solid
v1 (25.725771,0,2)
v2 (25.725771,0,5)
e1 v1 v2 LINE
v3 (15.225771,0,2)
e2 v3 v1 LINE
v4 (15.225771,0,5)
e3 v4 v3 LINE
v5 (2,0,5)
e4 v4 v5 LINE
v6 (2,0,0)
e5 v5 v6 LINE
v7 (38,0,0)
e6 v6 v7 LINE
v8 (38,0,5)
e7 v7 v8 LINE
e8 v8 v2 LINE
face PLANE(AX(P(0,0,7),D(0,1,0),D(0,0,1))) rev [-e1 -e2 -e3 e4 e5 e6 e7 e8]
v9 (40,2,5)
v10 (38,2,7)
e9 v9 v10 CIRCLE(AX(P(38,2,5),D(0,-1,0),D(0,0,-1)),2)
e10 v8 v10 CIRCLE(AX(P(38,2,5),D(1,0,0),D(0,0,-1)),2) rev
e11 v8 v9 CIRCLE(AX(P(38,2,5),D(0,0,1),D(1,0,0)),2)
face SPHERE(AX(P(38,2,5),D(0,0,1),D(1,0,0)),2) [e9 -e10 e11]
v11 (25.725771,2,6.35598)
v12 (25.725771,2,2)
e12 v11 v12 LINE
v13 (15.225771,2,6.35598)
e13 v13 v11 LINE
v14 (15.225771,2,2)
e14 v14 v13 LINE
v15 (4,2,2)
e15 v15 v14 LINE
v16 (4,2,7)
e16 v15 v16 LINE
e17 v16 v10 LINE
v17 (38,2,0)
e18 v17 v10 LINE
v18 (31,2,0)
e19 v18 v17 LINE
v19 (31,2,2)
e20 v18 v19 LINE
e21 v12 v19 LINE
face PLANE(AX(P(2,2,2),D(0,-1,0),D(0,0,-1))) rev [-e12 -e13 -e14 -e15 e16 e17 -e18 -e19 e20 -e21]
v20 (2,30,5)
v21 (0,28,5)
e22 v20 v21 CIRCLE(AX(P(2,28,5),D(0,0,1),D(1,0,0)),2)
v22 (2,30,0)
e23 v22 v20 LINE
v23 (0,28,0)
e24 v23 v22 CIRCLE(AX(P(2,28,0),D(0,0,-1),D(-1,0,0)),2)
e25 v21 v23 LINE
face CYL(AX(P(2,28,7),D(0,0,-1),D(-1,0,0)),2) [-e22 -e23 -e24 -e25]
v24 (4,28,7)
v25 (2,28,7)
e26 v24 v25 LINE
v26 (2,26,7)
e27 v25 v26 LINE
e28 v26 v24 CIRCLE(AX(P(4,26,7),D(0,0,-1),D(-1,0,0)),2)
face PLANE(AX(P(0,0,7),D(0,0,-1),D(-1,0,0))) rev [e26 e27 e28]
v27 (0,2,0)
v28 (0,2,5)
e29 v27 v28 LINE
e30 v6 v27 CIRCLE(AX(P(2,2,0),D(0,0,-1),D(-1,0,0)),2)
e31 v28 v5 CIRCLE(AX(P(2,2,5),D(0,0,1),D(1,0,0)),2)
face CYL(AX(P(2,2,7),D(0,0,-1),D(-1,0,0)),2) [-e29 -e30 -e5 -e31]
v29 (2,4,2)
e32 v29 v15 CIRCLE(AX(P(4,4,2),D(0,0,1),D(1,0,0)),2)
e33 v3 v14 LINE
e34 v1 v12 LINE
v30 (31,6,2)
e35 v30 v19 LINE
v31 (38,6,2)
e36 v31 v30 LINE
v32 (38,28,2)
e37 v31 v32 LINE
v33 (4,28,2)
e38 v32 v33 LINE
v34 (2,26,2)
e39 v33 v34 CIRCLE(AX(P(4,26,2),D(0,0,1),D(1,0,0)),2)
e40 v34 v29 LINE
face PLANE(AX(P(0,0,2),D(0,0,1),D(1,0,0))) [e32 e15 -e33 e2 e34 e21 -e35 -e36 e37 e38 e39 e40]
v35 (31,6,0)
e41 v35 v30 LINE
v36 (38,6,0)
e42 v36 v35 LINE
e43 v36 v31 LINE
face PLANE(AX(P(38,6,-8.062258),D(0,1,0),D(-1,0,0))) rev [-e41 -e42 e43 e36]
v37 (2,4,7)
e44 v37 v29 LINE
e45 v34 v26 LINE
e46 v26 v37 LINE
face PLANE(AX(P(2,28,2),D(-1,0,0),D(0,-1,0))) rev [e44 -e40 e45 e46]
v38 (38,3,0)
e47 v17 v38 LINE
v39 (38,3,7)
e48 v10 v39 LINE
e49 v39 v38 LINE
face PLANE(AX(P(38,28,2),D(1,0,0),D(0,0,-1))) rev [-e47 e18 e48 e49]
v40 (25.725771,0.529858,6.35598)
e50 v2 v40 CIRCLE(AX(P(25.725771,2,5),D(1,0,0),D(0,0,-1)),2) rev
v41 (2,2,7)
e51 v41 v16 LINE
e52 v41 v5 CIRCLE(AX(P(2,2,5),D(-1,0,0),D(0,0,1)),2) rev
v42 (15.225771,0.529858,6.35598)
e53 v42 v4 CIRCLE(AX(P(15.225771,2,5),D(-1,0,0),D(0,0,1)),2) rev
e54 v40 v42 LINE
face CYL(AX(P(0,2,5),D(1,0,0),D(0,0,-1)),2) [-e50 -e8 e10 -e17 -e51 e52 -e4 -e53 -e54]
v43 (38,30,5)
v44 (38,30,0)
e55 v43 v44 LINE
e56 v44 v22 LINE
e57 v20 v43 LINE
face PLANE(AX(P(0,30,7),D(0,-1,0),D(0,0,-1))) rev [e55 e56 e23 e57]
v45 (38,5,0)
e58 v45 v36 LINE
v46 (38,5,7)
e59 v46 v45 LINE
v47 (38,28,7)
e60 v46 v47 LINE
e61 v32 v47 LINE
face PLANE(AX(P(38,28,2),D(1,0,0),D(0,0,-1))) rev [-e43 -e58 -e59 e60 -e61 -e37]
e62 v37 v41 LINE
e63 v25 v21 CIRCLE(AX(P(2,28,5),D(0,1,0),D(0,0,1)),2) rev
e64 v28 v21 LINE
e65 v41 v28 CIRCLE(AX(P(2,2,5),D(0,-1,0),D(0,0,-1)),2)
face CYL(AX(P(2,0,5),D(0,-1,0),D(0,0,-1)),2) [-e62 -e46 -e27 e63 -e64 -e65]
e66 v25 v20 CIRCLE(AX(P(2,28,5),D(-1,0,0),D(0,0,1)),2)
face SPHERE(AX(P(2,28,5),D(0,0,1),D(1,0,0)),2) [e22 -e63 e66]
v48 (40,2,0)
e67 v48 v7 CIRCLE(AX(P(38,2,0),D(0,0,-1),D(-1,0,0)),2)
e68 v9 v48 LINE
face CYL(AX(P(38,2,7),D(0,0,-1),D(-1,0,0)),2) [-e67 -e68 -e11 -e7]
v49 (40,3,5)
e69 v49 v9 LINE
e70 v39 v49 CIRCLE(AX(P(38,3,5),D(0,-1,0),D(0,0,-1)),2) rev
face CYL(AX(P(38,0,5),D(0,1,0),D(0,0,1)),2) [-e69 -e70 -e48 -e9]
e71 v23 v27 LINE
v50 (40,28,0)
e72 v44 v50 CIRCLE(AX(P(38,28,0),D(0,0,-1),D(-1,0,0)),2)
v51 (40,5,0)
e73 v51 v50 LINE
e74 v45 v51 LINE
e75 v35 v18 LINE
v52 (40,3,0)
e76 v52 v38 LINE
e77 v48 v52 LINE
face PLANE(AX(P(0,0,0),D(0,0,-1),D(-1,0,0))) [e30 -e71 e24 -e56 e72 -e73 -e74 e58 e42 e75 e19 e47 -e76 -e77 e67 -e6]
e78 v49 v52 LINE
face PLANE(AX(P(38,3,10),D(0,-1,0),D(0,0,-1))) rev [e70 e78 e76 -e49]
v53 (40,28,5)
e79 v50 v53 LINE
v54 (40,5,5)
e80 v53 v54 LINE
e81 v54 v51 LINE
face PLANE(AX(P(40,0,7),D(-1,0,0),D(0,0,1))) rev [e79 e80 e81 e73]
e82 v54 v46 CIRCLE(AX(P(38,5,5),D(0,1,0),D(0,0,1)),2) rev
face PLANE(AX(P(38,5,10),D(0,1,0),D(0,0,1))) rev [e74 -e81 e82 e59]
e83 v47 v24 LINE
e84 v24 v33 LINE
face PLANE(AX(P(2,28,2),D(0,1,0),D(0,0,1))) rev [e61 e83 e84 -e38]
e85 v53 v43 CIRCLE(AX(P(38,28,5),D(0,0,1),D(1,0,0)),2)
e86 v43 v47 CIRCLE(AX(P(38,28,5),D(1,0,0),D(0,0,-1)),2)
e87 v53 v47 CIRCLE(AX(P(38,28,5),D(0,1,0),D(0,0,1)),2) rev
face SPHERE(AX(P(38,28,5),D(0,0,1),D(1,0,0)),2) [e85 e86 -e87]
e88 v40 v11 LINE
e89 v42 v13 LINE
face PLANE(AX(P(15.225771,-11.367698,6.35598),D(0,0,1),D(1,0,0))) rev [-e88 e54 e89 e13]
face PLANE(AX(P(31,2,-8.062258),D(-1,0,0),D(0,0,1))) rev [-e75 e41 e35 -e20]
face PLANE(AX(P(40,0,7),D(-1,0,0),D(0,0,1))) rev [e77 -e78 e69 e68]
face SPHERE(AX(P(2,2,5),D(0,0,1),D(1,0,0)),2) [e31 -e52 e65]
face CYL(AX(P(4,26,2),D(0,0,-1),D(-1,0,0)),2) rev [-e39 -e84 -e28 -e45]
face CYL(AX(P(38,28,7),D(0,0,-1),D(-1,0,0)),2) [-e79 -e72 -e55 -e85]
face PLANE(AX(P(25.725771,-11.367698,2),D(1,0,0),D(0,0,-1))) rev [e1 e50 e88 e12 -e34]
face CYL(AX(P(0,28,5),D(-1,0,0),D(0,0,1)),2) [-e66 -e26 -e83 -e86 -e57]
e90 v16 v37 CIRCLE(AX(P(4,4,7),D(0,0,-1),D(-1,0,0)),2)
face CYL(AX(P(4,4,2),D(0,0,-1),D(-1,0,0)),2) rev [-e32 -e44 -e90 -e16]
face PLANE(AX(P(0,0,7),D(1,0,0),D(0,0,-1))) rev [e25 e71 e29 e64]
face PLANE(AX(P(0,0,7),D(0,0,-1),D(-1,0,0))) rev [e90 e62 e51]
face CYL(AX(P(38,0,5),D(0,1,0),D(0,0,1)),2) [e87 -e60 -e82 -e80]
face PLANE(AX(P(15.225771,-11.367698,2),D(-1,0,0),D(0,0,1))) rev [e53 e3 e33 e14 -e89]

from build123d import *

# Parameters (mm, degrees)
SKETCH1_W           = 40
SKETCH1_H           = 30
BOSS_EXTRUDE1_DEPTH = 7
SKETCH2_W           = 36
SKETCH2_H           = 26
CUT_EXTRUDE1_DEPTH  = 5
FILLET1_R           = 2
FILLET2_R           = 2
SKETCH3_W           = 7
SKETCH3_H           = 4
CUT_EXTRUDE2_DEPTH  = 2
CUT_EXTRUDE3_REACH  = 51.325
SKETCH6_W           = 10.5
SKETCH6_H           = 4.355980474
SKETCH7_W           = 2
SKETCH7_H           = 2
CUT_EXTRUDE4_DEPTH  = 10


with BuildPart() as part:
    # Sketch1 → Boss-Extrude1 (new body)
    with BuildSketch(Plane.XY):
        with Locations((20, 15)):
            Rectangle(SKETCH1_W, SKETCH1_H)
    extrude(amount=BOSS_EXTRUDE1_DEPTH)

    # Sketch2 → Cut-Extrude1 (cut)
    with BuildSketch(Plane.XY.offset(7)):
        with Locations((20, 15)):
            Rectangle(SKETCH2_W, SKETCH2_H)
    extrude(amount=-CUT_EXTRUDE1_DEPTH, mode=Mode.SUBTRACT)

    # Fillet1
    fillet1_edges = [part.edges().sort_by_distance(p)[0] for p in [
        (2, 2, 4.5),
        (2, 28, 4.5),
    ]]
    fillet(fillet1_edges, radius=FILLET1_R)

    # Fillet2
    fillet2_edges = [part.edges().sort_by_distance(p)[0] for p in [
        (40, 15, 7),
        (20, 30, 7),
        (0, 15, 7),
        (20, 0, 7),
        (0, 30, 3.5),
        (40, 30, 3.5),
        (40, 0, 3.5),
        (0, 0, 3.5),
    ]]
    fillet(fillet2_edges, radius=FILLET2_R - 0.0001)  # a hair under: the kernel refuses the full size

    # Sketch3 → Cut-Extrude2 (cut)
    with BuildSketch(Plane.XY.offset(2)):
        with Locations((34.5, 4)):
            Rectangle(SKETCH3_W, SKETCH3_H)
    extrude(amount=-CUT_EXTRUDE2_DEPTH, mode=Mode.SUBTRACT)

    # Cut-Extrude3: up to this face of the body (flat: up to its plane)
    cut_extrude3_end = Plane(part.part.faces().sort_by_distance((20, 0, 2.50005))[0])
    # Sketch6 → Cut-Extrude3 (cut, up to the picked face)
    with BuildSketch(Plane(origin=(0, 2, 0), x_dir=(1, 0, 0), z_dir=(0, 1, 0)), mode=Mode.PRIVATE) as cut_extrude3_sk1:
        with Locations((20.475771031, -4.177990237)):
            Rectangle(SKETCH6_W, SKETCH6_H)
    cut_extrude3_tool1 = split(extrude(cut_extrude3_sk1.sketch, amount=-CUT_EXTRUDE3_REACH, mode=Mode.PRIVATE), bisect_by=cut_extrude3_end, keep=Keep.BOTH, mode=Mode.PRIVATE)
    add(cut_extrude3_tool1.solids().sort_by(Axis((20.475771, 2, 4.17799), (0, -1, 0)))[0], mode=Mode.SUBTRACT)

    # Sketch7 → Cut-Extrude4 (cut)
    with BuildSketch(Plane(origin=(0, 0, 0), x_dir=(-1, 0, 0), z_dir=(0, 0, -1))):
        with Locations((-39, 4)):
            Rectangle(SKETCH7_W, SKETCH7_H)
    extrude(amount=-CUT_EXTRUDE4_DEPTH, mode=Mode.SUBTRACT)


solid = part.part
